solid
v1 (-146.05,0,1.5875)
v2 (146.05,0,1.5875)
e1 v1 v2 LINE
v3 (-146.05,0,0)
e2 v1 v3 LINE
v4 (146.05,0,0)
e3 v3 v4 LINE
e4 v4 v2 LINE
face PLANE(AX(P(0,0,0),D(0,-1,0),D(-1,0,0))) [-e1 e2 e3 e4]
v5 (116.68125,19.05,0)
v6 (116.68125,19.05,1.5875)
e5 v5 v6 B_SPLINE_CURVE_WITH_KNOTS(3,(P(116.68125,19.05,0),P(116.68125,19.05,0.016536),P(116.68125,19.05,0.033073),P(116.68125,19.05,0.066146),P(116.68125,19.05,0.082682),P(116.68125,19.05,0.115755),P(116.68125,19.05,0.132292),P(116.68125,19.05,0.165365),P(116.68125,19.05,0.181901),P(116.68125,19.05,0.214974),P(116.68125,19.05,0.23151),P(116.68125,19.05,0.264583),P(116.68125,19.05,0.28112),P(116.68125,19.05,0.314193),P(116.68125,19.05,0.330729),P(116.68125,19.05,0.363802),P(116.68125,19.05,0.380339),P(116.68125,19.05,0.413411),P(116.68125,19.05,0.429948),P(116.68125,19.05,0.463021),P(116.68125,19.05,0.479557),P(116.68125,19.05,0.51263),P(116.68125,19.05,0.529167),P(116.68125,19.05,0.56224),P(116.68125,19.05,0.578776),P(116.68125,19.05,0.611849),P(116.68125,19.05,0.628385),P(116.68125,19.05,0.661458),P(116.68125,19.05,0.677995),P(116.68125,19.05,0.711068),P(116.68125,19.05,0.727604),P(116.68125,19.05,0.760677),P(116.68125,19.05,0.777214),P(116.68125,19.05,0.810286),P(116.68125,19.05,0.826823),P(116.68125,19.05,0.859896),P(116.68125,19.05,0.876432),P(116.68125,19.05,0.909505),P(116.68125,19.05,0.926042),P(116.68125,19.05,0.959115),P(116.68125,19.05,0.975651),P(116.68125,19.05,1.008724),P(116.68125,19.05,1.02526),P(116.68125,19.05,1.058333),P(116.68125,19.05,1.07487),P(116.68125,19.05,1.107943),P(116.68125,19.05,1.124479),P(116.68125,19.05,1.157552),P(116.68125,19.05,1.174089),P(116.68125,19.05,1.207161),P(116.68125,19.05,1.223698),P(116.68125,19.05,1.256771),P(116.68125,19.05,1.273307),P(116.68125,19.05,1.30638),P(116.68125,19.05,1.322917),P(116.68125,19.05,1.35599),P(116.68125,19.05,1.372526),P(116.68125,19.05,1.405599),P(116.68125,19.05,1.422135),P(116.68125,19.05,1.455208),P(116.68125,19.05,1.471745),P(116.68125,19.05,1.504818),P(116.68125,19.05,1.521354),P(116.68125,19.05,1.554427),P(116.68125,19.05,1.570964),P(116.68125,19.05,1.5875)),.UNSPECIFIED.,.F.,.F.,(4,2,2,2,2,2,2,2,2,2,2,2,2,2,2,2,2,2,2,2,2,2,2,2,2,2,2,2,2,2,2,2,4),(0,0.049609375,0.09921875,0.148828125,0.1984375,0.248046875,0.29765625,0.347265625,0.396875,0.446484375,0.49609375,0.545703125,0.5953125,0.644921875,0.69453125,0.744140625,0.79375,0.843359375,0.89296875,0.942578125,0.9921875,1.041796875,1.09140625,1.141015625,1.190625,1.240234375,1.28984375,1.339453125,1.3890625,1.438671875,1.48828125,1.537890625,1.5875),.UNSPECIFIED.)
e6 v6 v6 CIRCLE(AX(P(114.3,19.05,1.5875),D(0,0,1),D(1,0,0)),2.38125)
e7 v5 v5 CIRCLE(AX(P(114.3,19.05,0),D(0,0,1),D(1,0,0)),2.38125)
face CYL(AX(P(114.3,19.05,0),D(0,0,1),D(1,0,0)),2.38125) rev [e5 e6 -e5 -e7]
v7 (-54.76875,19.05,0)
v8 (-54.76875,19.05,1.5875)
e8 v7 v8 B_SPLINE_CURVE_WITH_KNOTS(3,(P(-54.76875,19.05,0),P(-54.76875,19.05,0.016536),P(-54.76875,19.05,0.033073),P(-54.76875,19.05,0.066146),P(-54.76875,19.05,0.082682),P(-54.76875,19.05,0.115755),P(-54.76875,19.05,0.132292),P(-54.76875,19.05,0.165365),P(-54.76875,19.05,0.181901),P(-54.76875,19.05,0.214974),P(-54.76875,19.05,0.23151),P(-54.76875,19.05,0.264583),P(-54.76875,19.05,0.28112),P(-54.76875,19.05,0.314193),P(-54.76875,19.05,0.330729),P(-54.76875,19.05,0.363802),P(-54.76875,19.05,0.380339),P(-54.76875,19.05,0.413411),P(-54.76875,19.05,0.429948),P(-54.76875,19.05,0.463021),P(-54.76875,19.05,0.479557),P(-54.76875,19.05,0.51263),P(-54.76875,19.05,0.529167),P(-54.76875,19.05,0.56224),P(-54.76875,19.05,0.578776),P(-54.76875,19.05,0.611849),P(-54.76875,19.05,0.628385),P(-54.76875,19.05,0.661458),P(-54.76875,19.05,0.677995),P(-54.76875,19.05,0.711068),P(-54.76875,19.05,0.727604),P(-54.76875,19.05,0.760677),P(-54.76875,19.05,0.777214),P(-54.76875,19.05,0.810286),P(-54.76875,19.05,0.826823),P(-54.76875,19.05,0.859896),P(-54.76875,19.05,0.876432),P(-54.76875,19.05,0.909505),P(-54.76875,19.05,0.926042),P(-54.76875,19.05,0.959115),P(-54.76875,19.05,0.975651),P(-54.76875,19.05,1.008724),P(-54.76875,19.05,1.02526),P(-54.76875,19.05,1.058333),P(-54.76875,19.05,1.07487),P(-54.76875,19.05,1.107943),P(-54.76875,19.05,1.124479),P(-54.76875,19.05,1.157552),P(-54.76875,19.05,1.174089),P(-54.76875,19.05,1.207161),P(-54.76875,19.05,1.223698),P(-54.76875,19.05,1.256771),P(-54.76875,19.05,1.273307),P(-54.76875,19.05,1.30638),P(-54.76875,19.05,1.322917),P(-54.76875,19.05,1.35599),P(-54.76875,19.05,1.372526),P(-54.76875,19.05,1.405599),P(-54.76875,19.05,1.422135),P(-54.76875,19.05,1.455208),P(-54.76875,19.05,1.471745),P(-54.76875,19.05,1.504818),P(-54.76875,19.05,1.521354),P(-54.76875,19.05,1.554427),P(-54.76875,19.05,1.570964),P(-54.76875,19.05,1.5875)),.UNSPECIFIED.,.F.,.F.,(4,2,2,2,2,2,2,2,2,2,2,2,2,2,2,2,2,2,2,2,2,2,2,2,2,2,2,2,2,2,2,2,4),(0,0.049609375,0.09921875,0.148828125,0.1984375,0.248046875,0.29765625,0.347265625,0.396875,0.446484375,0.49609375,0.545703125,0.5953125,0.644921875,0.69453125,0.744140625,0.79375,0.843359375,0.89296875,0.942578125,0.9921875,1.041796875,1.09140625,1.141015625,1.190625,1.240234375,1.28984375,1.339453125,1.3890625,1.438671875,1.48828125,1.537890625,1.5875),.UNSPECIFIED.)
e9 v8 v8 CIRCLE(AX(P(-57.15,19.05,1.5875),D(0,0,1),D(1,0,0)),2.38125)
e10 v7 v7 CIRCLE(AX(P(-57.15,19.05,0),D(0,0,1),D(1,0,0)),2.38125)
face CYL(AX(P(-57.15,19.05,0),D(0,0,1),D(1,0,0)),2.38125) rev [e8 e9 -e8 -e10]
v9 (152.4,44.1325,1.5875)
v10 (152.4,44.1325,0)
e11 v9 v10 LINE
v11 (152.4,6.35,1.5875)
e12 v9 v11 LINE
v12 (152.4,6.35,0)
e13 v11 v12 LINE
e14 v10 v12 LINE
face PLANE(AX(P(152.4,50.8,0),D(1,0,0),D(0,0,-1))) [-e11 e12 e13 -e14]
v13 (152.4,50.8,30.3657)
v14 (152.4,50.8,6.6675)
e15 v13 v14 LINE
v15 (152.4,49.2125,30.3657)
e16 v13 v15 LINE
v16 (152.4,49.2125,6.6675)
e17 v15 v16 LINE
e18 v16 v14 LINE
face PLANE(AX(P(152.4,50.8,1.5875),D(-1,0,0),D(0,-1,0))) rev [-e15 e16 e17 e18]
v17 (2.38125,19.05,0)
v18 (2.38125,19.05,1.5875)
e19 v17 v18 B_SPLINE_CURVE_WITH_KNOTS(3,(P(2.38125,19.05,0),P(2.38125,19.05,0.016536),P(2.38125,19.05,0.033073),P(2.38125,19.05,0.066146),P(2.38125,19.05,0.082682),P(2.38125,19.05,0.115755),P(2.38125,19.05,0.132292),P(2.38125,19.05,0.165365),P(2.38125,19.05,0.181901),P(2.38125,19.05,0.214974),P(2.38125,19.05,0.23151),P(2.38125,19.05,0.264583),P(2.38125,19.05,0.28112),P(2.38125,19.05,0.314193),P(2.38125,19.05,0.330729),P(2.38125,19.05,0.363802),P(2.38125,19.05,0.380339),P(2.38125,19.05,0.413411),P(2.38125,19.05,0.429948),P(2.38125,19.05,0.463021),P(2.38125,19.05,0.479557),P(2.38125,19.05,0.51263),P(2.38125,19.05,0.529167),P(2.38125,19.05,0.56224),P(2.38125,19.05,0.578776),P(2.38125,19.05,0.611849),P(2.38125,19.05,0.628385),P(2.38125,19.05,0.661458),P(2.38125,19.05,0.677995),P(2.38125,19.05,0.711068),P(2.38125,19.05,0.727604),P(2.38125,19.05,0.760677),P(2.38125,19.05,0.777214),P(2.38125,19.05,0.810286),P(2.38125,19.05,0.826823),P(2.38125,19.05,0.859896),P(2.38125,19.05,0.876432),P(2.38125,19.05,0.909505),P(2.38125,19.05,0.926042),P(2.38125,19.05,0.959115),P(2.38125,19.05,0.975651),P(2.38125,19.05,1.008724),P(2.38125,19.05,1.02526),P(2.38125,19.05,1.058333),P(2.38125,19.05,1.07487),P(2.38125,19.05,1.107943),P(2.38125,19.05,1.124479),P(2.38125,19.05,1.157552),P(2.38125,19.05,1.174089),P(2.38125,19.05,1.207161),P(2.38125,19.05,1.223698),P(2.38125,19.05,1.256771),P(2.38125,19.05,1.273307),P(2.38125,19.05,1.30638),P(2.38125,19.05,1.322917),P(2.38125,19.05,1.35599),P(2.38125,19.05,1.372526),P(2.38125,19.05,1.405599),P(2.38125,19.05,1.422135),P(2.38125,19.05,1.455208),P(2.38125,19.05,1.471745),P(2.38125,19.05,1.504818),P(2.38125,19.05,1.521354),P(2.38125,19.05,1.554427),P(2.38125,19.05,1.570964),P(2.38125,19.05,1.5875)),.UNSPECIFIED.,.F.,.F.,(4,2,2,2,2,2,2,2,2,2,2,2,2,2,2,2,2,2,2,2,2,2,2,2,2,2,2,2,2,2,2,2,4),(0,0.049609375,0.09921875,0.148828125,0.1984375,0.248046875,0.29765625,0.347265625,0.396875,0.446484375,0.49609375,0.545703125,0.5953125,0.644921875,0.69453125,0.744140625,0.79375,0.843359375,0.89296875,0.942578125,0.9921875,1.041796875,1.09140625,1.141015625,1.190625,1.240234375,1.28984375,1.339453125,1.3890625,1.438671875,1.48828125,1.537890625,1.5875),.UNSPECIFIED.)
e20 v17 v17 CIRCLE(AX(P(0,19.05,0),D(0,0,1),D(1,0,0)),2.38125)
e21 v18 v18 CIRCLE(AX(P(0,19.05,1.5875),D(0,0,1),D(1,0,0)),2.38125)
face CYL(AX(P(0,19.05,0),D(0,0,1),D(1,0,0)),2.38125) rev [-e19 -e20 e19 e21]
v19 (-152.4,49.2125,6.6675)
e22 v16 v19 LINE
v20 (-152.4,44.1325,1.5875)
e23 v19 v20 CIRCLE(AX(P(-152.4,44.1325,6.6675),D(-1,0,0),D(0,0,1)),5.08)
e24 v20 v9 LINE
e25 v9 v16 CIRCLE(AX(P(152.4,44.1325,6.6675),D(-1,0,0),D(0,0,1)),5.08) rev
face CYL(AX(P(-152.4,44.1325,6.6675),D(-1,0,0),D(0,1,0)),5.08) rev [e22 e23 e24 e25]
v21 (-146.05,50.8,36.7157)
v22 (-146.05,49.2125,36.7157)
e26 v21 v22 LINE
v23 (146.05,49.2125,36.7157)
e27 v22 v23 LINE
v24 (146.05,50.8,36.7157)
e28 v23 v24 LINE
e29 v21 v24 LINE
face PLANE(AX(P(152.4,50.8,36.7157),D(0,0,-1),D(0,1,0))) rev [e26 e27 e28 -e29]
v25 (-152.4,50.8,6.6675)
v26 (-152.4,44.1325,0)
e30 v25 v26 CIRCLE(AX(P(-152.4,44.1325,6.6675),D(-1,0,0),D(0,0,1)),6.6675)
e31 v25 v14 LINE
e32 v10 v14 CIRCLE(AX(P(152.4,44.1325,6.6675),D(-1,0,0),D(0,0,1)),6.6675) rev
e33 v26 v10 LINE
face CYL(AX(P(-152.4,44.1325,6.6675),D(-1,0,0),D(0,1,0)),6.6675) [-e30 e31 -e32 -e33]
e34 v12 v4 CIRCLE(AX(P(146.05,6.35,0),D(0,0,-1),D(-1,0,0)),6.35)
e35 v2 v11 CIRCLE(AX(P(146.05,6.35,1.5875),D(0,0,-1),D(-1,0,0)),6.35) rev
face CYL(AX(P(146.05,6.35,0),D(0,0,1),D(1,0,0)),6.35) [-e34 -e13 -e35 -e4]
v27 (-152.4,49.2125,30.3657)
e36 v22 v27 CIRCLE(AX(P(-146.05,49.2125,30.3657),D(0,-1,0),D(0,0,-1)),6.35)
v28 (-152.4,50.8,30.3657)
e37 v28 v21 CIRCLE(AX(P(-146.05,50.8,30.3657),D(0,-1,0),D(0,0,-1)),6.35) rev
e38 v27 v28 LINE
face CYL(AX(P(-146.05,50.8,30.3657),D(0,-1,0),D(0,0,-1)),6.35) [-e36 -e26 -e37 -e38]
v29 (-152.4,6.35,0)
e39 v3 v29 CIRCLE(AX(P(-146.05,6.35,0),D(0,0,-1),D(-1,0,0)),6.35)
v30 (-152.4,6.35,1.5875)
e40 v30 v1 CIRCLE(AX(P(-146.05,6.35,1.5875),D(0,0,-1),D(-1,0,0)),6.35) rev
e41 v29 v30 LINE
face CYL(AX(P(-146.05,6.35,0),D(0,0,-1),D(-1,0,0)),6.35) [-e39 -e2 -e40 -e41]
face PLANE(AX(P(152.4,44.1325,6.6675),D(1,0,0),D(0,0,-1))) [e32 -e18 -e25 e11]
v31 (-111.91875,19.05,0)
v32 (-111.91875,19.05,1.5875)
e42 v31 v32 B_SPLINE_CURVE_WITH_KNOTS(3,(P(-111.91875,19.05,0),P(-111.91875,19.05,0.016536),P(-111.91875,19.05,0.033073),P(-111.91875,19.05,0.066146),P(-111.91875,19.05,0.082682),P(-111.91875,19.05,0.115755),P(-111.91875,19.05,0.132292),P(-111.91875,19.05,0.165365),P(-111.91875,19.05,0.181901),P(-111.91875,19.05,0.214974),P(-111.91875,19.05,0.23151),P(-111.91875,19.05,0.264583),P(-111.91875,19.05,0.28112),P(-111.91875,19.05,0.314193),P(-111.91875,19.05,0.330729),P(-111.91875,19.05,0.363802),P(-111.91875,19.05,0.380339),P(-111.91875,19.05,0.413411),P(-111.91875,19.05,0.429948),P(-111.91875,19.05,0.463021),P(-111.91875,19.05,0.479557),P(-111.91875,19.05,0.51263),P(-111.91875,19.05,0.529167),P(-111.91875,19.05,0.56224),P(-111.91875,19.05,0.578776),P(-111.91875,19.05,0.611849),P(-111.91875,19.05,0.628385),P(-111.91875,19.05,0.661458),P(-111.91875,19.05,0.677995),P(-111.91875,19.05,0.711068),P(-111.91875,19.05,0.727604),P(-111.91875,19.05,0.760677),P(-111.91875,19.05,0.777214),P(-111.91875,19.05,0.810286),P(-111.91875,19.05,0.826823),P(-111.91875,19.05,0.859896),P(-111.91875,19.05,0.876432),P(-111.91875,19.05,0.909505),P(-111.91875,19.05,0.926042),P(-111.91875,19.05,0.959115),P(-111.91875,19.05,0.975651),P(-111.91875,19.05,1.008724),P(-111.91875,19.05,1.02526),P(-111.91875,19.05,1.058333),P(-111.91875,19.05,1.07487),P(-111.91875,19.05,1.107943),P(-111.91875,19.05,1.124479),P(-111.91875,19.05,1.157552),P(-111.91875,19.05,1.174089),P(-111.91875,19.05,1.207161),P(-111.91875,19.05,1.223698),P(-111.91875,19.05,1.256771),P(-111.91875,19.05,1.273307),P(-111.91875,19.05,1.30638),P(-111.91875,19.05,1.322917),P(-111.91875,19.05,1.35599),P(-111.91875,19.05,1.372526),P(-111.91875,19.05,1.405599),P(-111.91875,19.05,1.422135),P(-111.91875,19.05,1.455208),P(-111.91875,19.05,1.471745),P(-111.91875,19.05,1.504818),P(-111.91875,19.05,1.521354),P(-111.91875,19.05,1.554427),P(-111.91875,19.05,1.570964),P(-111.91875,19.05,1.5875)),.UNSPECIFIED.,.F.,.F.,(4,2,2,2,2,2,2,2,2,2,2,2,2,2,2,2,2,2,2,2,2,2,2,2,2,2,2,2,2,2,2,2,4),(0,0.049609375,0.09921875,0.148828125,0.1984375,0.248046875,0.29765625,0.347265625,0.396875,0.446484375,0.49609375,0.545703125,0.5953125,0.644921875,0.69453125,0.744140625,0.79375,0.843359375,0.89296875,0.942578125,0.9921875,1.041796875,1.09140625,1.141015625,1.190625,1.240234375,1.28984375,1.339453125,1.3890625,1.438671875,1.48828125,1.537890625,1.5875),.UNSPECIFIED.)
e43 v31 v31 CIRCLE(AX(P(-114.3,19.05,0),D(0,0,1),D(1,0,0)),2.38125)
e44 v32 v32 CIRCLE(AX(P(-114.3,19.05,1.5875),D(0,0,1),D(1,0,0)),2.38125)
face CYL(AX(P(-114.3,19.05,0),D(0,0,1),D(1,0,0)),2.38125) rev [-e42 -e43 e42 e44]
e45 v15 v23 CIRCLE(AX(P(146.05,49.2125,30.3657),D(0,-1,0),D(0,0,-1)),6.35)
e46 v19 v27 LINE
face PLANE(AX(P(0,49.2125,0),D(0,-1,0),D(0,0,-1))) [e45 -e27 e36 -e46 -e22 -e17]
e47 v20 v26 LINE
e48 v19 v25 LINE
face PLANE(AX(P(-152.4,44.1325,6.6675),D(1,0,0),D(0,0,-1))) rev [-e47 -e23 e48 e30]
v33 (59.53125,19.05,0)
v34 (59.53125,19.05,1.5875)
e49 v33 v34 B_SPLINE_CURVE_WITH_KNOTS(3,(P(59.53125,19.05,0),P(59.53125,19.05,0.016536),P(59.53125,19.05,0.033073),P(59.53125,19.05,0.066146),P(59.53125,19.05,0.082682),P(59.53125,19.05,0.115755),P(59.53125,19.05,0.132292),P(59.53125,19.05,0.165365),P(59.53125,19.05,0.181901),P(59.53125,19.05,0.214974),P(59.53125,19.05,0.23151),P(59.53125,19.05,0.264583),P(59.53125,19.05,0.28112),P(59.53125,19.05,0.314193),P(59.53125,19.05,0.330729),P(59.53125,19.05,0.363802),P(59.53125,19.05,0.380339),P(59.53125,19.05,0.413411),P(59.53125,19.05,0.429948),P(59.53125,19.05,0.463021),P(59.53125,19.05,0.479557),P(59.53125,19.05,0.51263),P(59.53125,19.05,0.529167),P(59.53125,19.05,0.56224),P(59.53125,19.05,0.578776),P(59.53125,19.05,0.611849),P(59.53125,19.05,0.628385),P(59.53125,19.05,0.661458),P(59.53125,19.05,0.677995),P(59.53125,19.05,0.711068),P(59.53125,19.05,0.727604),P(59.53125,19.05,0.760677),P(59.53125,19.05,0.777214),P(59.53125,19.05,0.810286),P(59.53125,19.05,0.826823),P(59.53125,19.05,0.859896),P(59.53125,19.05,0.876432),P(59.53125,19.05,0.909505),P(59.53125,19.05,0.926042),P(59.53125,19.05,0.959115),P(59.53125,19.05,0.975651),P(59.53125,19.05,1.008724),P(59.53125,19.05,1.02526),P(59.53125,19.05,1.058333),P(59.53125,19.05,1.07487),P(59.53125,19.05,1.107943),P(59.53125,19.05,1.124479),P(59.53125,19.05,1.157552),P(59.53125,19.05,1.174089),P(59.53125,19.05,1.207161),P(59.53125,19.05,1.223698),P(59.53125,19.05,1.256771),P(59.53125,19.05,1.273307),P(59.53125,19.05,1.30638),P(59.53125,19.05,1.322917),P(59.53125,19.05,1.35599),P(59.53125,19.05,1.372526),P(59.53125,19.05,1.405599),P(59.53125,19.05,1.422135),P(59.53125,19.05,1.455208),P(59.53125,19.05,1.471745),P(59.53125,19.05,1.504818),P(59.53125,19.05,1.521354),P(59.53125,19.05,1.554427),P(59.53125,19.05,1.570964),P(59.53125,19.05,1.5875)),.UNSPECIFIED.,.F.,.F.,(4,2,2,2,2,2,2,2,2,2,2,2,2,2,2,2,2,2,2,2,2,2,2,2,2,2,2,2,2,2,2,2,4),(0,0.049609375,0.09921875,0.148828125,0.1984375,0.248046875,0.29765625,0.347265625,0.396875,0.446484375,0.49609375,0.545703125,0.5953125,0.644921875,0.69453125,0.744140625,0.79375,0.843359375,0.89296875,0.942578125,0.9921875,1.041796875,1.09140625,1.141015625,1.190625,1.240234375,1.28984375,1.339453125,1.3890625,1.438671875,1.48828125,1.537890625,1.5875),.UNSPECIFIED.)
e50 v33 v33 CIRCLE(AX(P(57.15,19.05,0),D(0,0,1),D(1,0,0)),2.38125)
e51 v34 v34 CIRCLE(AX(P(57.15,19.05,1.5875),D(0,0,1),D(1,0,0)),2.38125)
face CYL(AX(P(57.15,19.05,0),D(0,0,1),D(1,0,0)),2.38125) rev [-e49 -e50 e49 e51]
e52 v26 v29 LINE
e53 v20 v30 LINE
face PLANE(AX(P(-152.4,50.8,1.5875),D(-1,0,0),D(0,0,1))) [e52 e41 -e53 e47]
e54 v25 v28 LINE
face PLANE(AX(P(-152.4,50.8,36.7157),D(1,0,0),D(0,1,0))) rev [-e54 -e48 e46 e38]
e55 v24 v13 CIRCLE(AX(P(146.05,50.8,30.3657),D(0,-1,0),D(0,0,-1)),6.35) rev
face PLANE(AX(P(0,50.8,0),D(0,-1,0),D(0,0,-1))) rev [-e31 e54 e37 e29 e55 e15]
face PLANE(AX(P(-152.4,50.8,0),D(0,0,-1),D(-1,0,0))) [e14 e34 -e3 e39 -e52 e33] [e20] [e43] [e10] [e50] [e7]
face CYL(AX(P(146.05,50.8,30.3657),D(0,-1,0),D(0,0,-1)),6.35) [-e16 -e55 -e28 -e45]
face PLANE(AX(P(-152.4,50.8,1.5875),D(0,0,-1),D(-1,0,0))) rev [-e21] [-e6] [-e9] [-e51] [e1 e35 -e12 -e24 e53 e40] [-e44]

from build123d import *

# Parameters (mm, degrees)
SKETCH1_W                    = 304.8
SKETCH1_H                    = 1.5875
BASE_FLANGE1_DEPTH           = 50.8
EDGE_FLANGE1_STRIP_W         = 16.51
EDGE_FLANGE1_STRIP_H         = 1.5875
EDGE_FLANGE1_STRIP_CUT_DEPTH = 304.8
EDGE_FLANGE1_DEPTH           = 304.8
SKETCH10_R                   = 2.38125
CUT_EXTRUDE1_DEPTH           = 165.439625502
FILLET1_R                    = 6.35


# Sheet-metal steps are written as plain solids
with BuildPart() as part:
    # Sketch1 → Base-Flange1 (new body)
    with BuildSketch(Plane(origin=(0, 0, 0), x_dir=(1, 0, 0), z_dir=(0, 1, 0))):
        with Locations((0, -0.79375)):
            Rectangle(SKETCH1_W, SKETCH1_H)
    extrude(amount=BASE_FLANGE1_DEPTH)

    # Edge-Flange1 strip (across the edge) → Edge-Flange1 strip cut (cut)
    with BuildSketch(Plane(origin=(152.4, 50.8, 1.5875), x_dir=(0, -1, 0), z_dir=(-1, 0, 0))):
        with Locations((-1.5875, -0.79375)):
            Rectangle(EDGE_FLANGE1_STRIP_W, EDGE_FLANGE1_STRIP_H)
    extrude(amount=EDGE_FLANGE1_STRIP_CUT_DEPTH, mode=Mode.SUBTRACT)

    # Edge-Flange1 section (across the edge) → Edge-Flange1 (add)
    with BuildSketch(Plane(origin=(152.4, 50.8, 1.5875), x_dir=(0, -1, 0), z_dir=(-1, 0, 0))):
        with BuildLine():
            Line((0, 5.08), (0, 35.1282))
            Line((0, 35.1282), (1.5875, 35.1282))
            Line((1.5875, 35.1282), (1.5875, 5.08))
            ThreePointArc((1.5875, 5.08), (3.075397552, 1.487897552), (6.6675, 0))
            Line((6.6675, 0), (6.6675, -1.5875))
            ThreePointArc((6.6675, -1.5875), (1.952865536, 0.365365536), (0, 5.08))
        make_face()
    extrude(amount=EDGE_FLANGE1_DEPTH)

    # Sketch10 → Cut-Extrude1 (cut, through all)
    with BuildSketch(Plane.XY.offset(1.5875)):
        with Locations((-114.3, 19.05)):
            Circle(SKETCH10_R)
        with Locations((114.3, 19.05)):
            Circle(SKETCH10_R)
        with Locations((0, 19.05)):
            Circle(SKETCH10_R)
        with Locations((57.15, 19.05)):
            Circle(SKETCH10_R)
        with Locations((-57.15, 19.05)):
            Circle(SKETCH10_R)
    extrude(amount=-CUT_EXTRUDE1_DEPTH, mode=Mode.SUBTRACT)

    # Fillet1
    fillet1_edges = [part.edges().sort_by_distance(p)[0] for p in [
        (152.4, 50.00625, 36.7157),
        (-152.4, 50.00625, 36.7157),
        (-152.4, 0, 0.79375),
        (152.4, 0, 0.79375),
    ]]
    fillet(fillet1_edges, radius=FILLET1_R)


solid = part.part
